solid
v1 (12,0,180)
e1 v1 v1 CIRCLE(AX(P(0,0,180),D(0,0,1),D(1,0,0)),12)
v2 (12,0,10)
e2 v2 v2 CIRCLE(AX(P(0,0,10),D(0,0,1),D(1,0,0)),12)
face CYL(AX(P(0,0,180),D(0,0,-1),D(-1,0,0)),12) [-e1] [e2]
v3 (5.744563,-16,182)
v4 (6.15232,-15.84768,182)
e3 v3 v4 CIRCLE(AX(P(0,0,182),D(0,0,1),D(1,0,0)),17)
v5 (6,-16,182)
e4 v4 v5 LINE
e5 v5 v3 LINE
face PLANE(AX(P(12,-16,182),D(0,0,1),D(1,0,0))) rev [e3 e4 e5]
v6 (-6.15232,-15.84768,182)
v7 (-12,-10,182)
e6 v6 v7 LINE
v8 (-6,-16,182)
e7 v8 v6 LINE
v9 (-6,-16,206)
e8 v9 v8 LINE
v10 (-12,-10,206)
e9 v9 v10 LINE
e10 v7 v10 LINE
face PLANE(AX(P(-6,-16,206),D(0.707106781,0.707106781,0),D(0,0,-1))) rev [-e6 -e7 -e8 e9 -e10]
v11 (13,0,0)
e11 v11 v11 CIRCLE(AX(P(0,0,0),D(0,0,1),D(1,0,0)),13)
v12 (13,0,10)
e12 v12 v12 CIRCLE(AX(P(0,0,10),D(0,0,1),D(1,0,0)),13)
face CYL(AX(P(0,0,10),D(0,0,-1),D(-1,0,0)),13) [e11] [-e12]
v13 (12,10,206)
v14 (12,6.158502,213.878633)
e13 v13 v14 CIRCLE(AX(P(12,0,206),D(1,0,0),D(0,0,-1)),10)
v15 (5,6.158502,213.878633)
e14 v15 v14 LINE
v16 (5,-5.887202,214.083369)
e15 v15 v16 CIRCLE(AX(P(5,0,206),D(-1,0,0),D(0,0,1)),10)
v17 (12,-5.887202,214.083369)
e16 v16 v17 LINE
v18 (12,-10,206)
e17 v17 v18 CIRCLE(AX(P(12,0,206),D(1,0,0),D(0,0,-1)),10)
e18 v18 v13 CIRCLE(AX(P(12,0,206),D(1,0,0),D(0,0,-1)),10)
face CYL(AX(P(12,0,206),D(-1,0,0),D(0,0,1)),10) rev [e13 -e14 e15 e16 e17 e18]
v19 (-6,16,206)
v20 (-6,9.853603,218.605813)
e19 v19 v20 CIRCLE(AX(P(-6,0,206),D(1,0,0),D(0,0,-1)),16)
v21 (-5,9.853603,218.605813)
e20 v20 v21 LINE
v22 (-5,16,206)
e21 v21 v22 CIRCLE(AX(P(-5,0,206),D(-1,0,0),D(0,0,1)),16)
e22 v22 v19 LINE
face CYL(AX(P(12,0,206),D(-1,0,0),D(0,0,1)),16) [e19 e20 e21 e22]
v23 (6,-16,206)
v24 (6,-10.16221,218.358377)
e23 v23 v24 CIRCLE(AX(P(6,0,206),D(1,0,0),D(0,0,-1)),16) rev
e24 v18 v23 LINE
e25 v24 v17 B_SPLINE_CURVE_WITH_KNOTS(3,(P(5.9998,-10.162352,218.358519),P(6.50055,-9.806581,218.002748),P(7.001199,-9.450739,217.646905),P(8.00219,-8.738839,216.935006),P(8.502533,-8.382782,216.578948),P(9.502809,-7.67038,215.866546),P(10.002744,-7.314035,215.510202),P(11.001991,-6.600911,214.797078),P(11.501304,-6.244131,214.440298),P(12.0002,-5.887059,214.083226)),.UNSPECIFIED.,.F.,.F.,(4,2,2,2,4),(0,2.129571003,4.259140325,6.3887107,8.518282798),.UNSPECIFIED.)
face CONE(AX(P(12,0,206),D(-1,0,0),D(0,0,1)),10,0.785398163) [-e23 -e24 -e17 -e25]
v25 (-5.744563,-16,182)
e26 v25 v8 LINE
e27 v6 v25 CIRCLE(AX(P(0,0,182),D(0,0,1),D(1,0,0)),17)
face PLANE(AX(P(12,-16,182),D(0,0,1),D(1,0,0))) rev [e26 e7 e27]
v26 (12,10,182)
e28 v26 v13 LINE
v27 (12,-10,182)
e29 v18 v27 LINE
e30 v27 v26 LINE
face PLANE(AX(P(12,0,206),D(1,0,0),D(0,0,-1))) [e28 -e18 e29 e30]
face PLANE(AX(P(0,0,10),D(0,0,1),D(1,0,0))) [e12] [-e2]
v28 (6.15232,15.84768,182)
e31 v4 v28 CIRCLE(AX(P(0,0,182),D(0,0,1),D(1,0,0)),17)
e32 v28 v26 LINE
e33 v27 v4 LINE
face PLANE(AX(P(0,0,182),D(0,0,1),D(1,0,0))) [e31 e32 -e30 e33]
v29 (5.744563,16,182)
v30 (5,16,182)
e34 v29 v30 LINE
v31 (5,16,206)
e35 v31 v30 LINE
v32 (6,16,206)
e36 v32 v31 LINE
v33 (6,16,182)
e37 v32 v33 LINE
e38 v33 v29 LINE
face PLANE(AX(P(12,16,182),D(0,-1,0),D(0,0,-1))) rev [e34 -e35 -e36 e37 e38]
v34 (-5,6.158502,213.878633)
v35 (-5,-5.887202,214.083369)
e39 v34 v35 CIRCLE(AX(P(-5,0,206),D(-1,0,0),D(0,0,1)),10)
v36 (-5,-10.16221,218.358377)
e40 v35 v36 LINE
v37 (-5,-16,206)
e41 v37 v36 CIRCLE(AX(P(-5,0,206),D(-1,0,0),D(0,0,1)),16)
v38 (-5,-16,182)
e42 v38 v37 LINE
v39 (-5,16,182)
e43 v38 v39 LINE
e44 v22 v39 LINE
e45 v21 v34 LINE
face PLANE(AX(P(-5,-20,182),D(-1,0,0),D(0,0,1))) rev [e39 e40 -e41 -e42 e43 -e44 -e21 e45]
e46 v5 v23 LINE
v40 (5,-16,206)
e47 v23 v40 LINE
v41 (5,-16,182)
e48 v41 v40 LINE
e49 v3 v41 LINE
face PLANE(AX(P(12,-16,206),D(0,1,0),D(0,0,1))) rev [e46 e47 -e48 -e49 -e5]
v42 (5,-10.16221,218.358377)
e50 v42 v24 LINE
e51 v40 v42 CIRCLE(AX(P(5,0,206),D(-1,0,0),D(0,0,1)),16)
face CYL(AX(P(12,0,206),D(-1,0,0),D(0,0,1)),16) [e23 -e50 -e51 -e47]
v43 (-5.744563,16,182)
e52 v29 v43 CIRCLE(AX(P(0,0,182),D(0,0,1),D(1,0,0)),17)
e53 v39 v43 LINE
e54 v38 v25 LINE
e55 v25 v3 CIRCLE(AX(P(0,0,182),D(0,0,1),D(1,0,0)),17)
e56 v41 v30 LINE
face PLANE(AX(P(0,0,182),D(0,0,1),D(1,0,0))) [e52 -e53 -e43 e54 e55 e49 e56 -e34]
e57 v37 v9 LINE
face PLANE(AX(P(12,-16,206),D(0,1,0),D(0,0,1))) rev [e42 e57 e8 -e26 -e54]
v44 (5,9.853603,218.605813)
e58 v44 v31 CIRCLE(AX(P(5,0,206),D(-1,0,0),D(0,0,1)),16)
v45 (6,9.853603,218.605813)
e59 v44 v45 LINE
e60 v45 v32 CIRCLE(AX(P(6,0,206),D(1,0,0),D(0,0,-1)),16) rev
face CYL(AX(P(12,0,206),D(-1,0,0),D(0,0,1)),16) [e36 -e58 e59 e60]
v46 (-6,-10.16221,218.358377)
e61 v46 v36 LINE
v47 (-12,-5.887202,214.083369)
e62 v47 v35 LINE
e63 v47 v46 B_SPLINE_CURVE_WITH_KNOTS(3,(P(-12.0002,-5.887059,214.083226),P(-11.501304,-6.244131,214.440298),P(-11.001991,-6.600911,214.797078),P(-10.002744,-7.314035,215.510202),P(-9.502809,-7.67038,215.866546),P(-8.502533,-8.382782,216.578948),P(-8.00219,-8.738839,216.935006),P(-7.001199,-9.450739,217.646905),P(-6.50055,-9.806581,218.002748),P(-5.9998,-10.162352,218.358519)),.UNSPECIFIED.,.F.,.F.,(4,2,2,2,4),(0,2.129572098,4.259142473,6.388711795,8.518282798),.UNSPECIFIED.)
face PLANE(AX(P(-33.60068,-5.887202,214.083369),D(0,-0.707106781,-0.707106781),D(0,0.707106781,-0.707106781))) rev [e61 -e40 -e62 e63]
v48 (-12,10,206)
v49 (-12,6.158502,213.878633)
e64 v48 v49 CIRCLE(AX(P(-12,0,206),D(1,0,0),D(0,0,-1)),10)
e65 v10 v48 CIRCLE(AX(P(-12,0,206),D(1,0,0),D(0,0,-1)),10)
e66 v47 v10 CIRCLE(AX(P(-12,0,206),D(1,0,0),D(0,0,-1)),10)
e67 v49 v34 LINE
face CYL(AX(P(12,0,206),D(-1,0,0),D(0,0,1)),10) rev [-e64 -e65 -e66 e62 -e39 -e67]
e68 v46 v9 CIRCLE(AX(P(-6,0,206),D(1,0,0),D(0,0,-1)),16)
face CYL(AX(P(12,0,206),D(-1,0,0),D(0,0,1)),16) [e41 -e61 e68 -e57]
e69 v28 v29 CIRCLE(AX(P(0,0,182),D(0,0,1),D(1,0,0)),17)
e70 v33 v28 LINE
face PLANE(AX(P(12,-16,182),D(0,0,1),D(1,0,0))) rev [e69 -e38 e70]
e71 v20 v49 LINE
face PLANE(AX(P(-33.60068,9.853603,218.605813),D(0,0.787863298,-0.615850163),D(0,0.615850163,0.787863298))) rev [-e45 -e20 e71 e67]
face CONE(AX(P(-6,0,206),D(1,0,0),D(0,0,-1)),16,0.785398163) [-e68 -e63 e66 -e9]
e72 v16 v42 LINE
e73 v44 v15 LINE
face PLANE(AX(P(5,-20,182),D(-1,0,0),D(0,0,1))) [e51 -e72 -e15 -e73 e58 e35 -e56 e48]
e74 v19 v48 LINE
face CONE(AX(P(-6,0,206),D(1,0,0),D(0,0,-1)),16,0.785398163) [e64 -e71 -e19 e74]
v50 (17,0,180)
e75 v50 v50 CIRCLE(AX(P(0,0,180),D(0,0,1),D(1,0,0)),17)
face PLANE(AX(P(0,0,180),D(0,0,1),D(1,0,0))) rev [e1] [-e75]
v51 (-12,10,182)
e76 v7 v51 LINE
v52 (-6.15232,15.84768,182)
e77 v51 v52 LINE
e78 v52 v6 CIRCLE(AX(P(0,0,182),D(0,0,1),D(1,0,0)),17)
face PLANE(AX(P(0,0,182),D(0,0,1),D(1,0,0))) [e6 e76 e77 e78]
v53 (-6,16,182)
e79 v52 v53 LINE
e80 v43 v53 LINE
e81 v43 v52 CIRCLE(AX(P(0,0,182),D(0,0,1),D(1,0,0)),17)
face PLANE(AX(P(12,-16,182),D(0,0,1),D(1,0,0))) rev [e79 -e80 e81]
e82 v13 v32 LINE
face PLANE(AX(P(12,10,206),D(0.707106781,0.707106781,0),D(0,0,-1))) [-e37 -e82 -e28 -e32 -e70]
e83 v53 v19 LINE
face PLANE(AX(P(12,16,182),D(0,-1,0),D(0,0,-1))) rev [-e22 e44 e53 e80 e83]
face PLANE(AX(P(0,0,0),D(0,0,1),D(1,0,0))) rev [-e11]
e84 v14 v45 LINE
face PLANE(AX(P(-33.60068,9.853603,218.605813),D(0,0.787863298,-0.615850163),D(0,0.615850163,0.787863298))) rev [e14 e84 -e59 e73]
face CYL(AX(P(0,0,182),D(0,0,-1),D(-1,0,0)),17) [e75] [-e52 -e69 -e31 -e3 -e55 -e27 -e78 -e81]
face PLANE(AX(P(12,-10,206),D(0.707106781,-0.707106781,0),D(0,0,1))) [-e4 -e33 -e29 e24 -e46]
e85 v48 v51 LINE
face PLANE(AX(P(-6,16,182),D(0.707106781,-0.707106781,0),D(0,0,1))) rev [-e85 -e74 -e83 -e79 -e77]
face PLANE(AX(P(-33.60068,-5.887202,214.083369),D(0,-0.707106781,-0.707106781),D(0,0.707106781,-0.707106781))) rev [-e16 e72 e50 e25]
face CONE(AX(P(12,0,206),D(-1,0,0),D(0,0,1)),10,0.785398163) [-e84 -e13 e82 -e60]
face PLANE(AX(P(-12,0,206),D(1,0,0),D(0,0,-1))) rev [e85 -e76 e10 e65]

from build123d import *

# Parameters (mm, degrees)
SKETCH1_R           = 13
SKETCH1_R_2         = 12
BOSS_EXTRUDE1_DEPTH = 10
SKETCH2_R           = 12
BOSS_EXTRUDE2_DEPTH = 170
SKETCH3_R           = 17
BOSS_EXTRUDE3_DEPTH = 2
SKETCH4_R           = 10
BOSS_EXTRUDE4_DEPTH = 12
CHAMFER1_SIZE       = 6
SKETCH5_W           = 10
SKETCH5_H           = 41
CUT_EXTRUDE1_DEPTH  = 20
CUT_EXTRUDE2_REACH  = 226.531


with BuildPart() as part:
    # Sketch1 → Boss-Extrude1 (new body)
    # profile 1 of 2: a face of its own
    with BuildSketch(Plane.XY):
        Circle(SKETCH1_R)
        Circle(SKETCH1_R_2, mode=Mode.SUBTRACT)
    # profile 2 of 2: a face of its own
    with BuildSketch(Plane.XY):
        Circle(SKETCH1_R_2)
    extrude(amount=BOSS_EXTRUDE1_DEPTH)

    # Sketch2 → Boss-Extrude2 (add)
    with BuildSketch(Plane.XY.offset(10)):
        Circle(SKETCH2_R)
    extrude(amount=BOSS_EXTRUDE2_DEPTH)

    # Sketch3 → Boss-Extrude3 (add)
    with BuildSketch(Plane.XY.offset(180)):
        Circle(SKETCH3_R)
    extrude(amount=BOSS_EXTRUDE3_DEPTH)

    # Sketch4 → Boss-Extrude4 (add, symmetric)
    with BuildSketch(Plane(origin=(0, 0, 0), x_dir=(0, 0, -1), z_dir=(1, 0, 0))):
        with BuildLine():
            Line((-182, 16), (-206, 16))
            ThreePointArc((-206, 16), (-222, 0), (-206, -16))
            Line((-206, -16), (-182, -16))
            Line((-182, -16), (-182, 16))
        make_face()
        with Locations((-206, 0)):
            Circle(SKETCH4_R, mode=Mode.SUBTRACT)
    extrude(amount=BOSS_EXTRUDE4_DEPTH, both=True)

    # Chamfer1
    # the kernel refuses this chamfer: 6 mm, written as the material it takes off along each edge
    with BuildSketch(Plane(origin=(12, 16, 182), x_dir=(0.027495876610586487, -0.9996219169112968, 0), z_dir=(0, 0, 1)), Plane(origin=(12, -16, 206), x_dir=(0.027495876610586487, 0.9996219169112968, 0), z_dir=(0, 0, -1)), Plane(origin=(-12, -16, 206), x_dir=(0.9996219169112968, -0.027495876610586202, 0), z_dir=(0, 0, -1))) as chamfer1_piece_1:
        Polygon((CHAMFER1_SIZE * 0.999621916911, -CHAMFER1_SIZE * 0.0274958766106), (-CHAMFER1_SIZE * 0.0274958766106, -CHAMFER1_SIZE * 0.999621916911), (0, 0), align=None)
    extrude(amount=24, mode=Mode.SUBTRACT)
    with BuildSketch(Plane(origin=(12, 0, 206), x_dir=(0, 1, 0), z_dir=(0, 0, -1))) as chamfer1_piece_2:
        Polygon((16 - CHAMFER1_SIZE, 0), (16, -CHAMFER1_SIZE), (16, 0), align=None)
    revolve(axis=Axis((12, 0, 206), (1, 0, 0)), revolution_arc=180, mode=Mode.SUBTRACT)
    with BuildSketch(Plane(origin=(-12, 16, 182), x_dir=(-0.027495876610586487, -0.9996219169112968, 0), z_dir=(0, 0, 1))) as chamfer1_piece_3:
        Polygon((CHAMFER1_SIZE * 0.999621916911, CHAMFER1_SIZE * 0.0274958766106), (-CHAMFER1_SIZE * 0.0274958766106, CHAMFER1_SIZE * 0.999621916911), (0, 0), align=None)
    extrude(amount=24, mode=Mode.SUBTRACT)
    with BuildSketch(Plane(origin=(-12, 0, 206), x_dir=(0, 1, 0), z_dir=(0, 0, -1))) as chamfer1_piece_4:
        Polygon((16 - CHAMFER1_SIZE, 0), (16, CHAMFER1_SIZE), (16, 0), align=None)
    revolve(axis=Axis((-12, 0, 206), (1, 0, 0)), revolution_arc=180, mode=Mode.SUBTRACT)

    # Sketch5 → Cut-Extrude1 (cut, symmetric)
    with BuildSketch(Plane(origin=(0, 0, 0), x_dir=(1, 0, 0), z_dir=(0, 1, 0))):
        with Locations((0, -202.5)):
            Rectangle(SKETCH5_W, SKETCH5_H)
    extrude(amount=CUT_EXTRUDE1_DEPTH, both=True, mode=Mode.SUBTRACT)

    # Cut-Extrude2: up to this face of the body (flat: up to its plane)
    cut_extrude2_end = Plane(part.part.faces().sort_by_distance((-12, 0, 190.227277531))[0])
    # Sketch6 → Cut-Extrude2 (cut, up to the picked face)
    with BuildSketch(Plane(origin=(12, 0, 0), x_dir=(0, 0, -1), z_dir=(1, 0, 0)), mode=Mode.PRIVATE) as cut_extrude2_sk1:
        with BuildLine():
            Line((-218.605812772, 9.853602608), (-213.878632982, 6.15850163))
            ThreePointArc((-213.878632982, 6.15850163), (-215.998555894, 0.169941286), (-214.083368787, -5.887202141))
            Line((-214.083368787, -5.887202141), (-218.35837697, -10.162210324))
            ThreePointArc((-218.35837697, -10.162210324), (-221.998777585, -0.197777146), (-218.605812772, 9.853602608))
        make_face()
    cut_extrude2_tool1 = split(extrude(cut_extrude2_sk1.sketch, amount=-CUT_EXTRUDE2_REACH, mode=Mode.PRIVATE), bisect_by=cut_extrude2_end, keep=Keep.BOTH, mode=Mode.PRIVATE)
    add(cut_extrude2_tool1.solids().sort_by(Axis((12, -0.027254, 218.293854), (-1, 0, 0)))[0], mode=Mode.SUBTRACT)


solid = part.part
